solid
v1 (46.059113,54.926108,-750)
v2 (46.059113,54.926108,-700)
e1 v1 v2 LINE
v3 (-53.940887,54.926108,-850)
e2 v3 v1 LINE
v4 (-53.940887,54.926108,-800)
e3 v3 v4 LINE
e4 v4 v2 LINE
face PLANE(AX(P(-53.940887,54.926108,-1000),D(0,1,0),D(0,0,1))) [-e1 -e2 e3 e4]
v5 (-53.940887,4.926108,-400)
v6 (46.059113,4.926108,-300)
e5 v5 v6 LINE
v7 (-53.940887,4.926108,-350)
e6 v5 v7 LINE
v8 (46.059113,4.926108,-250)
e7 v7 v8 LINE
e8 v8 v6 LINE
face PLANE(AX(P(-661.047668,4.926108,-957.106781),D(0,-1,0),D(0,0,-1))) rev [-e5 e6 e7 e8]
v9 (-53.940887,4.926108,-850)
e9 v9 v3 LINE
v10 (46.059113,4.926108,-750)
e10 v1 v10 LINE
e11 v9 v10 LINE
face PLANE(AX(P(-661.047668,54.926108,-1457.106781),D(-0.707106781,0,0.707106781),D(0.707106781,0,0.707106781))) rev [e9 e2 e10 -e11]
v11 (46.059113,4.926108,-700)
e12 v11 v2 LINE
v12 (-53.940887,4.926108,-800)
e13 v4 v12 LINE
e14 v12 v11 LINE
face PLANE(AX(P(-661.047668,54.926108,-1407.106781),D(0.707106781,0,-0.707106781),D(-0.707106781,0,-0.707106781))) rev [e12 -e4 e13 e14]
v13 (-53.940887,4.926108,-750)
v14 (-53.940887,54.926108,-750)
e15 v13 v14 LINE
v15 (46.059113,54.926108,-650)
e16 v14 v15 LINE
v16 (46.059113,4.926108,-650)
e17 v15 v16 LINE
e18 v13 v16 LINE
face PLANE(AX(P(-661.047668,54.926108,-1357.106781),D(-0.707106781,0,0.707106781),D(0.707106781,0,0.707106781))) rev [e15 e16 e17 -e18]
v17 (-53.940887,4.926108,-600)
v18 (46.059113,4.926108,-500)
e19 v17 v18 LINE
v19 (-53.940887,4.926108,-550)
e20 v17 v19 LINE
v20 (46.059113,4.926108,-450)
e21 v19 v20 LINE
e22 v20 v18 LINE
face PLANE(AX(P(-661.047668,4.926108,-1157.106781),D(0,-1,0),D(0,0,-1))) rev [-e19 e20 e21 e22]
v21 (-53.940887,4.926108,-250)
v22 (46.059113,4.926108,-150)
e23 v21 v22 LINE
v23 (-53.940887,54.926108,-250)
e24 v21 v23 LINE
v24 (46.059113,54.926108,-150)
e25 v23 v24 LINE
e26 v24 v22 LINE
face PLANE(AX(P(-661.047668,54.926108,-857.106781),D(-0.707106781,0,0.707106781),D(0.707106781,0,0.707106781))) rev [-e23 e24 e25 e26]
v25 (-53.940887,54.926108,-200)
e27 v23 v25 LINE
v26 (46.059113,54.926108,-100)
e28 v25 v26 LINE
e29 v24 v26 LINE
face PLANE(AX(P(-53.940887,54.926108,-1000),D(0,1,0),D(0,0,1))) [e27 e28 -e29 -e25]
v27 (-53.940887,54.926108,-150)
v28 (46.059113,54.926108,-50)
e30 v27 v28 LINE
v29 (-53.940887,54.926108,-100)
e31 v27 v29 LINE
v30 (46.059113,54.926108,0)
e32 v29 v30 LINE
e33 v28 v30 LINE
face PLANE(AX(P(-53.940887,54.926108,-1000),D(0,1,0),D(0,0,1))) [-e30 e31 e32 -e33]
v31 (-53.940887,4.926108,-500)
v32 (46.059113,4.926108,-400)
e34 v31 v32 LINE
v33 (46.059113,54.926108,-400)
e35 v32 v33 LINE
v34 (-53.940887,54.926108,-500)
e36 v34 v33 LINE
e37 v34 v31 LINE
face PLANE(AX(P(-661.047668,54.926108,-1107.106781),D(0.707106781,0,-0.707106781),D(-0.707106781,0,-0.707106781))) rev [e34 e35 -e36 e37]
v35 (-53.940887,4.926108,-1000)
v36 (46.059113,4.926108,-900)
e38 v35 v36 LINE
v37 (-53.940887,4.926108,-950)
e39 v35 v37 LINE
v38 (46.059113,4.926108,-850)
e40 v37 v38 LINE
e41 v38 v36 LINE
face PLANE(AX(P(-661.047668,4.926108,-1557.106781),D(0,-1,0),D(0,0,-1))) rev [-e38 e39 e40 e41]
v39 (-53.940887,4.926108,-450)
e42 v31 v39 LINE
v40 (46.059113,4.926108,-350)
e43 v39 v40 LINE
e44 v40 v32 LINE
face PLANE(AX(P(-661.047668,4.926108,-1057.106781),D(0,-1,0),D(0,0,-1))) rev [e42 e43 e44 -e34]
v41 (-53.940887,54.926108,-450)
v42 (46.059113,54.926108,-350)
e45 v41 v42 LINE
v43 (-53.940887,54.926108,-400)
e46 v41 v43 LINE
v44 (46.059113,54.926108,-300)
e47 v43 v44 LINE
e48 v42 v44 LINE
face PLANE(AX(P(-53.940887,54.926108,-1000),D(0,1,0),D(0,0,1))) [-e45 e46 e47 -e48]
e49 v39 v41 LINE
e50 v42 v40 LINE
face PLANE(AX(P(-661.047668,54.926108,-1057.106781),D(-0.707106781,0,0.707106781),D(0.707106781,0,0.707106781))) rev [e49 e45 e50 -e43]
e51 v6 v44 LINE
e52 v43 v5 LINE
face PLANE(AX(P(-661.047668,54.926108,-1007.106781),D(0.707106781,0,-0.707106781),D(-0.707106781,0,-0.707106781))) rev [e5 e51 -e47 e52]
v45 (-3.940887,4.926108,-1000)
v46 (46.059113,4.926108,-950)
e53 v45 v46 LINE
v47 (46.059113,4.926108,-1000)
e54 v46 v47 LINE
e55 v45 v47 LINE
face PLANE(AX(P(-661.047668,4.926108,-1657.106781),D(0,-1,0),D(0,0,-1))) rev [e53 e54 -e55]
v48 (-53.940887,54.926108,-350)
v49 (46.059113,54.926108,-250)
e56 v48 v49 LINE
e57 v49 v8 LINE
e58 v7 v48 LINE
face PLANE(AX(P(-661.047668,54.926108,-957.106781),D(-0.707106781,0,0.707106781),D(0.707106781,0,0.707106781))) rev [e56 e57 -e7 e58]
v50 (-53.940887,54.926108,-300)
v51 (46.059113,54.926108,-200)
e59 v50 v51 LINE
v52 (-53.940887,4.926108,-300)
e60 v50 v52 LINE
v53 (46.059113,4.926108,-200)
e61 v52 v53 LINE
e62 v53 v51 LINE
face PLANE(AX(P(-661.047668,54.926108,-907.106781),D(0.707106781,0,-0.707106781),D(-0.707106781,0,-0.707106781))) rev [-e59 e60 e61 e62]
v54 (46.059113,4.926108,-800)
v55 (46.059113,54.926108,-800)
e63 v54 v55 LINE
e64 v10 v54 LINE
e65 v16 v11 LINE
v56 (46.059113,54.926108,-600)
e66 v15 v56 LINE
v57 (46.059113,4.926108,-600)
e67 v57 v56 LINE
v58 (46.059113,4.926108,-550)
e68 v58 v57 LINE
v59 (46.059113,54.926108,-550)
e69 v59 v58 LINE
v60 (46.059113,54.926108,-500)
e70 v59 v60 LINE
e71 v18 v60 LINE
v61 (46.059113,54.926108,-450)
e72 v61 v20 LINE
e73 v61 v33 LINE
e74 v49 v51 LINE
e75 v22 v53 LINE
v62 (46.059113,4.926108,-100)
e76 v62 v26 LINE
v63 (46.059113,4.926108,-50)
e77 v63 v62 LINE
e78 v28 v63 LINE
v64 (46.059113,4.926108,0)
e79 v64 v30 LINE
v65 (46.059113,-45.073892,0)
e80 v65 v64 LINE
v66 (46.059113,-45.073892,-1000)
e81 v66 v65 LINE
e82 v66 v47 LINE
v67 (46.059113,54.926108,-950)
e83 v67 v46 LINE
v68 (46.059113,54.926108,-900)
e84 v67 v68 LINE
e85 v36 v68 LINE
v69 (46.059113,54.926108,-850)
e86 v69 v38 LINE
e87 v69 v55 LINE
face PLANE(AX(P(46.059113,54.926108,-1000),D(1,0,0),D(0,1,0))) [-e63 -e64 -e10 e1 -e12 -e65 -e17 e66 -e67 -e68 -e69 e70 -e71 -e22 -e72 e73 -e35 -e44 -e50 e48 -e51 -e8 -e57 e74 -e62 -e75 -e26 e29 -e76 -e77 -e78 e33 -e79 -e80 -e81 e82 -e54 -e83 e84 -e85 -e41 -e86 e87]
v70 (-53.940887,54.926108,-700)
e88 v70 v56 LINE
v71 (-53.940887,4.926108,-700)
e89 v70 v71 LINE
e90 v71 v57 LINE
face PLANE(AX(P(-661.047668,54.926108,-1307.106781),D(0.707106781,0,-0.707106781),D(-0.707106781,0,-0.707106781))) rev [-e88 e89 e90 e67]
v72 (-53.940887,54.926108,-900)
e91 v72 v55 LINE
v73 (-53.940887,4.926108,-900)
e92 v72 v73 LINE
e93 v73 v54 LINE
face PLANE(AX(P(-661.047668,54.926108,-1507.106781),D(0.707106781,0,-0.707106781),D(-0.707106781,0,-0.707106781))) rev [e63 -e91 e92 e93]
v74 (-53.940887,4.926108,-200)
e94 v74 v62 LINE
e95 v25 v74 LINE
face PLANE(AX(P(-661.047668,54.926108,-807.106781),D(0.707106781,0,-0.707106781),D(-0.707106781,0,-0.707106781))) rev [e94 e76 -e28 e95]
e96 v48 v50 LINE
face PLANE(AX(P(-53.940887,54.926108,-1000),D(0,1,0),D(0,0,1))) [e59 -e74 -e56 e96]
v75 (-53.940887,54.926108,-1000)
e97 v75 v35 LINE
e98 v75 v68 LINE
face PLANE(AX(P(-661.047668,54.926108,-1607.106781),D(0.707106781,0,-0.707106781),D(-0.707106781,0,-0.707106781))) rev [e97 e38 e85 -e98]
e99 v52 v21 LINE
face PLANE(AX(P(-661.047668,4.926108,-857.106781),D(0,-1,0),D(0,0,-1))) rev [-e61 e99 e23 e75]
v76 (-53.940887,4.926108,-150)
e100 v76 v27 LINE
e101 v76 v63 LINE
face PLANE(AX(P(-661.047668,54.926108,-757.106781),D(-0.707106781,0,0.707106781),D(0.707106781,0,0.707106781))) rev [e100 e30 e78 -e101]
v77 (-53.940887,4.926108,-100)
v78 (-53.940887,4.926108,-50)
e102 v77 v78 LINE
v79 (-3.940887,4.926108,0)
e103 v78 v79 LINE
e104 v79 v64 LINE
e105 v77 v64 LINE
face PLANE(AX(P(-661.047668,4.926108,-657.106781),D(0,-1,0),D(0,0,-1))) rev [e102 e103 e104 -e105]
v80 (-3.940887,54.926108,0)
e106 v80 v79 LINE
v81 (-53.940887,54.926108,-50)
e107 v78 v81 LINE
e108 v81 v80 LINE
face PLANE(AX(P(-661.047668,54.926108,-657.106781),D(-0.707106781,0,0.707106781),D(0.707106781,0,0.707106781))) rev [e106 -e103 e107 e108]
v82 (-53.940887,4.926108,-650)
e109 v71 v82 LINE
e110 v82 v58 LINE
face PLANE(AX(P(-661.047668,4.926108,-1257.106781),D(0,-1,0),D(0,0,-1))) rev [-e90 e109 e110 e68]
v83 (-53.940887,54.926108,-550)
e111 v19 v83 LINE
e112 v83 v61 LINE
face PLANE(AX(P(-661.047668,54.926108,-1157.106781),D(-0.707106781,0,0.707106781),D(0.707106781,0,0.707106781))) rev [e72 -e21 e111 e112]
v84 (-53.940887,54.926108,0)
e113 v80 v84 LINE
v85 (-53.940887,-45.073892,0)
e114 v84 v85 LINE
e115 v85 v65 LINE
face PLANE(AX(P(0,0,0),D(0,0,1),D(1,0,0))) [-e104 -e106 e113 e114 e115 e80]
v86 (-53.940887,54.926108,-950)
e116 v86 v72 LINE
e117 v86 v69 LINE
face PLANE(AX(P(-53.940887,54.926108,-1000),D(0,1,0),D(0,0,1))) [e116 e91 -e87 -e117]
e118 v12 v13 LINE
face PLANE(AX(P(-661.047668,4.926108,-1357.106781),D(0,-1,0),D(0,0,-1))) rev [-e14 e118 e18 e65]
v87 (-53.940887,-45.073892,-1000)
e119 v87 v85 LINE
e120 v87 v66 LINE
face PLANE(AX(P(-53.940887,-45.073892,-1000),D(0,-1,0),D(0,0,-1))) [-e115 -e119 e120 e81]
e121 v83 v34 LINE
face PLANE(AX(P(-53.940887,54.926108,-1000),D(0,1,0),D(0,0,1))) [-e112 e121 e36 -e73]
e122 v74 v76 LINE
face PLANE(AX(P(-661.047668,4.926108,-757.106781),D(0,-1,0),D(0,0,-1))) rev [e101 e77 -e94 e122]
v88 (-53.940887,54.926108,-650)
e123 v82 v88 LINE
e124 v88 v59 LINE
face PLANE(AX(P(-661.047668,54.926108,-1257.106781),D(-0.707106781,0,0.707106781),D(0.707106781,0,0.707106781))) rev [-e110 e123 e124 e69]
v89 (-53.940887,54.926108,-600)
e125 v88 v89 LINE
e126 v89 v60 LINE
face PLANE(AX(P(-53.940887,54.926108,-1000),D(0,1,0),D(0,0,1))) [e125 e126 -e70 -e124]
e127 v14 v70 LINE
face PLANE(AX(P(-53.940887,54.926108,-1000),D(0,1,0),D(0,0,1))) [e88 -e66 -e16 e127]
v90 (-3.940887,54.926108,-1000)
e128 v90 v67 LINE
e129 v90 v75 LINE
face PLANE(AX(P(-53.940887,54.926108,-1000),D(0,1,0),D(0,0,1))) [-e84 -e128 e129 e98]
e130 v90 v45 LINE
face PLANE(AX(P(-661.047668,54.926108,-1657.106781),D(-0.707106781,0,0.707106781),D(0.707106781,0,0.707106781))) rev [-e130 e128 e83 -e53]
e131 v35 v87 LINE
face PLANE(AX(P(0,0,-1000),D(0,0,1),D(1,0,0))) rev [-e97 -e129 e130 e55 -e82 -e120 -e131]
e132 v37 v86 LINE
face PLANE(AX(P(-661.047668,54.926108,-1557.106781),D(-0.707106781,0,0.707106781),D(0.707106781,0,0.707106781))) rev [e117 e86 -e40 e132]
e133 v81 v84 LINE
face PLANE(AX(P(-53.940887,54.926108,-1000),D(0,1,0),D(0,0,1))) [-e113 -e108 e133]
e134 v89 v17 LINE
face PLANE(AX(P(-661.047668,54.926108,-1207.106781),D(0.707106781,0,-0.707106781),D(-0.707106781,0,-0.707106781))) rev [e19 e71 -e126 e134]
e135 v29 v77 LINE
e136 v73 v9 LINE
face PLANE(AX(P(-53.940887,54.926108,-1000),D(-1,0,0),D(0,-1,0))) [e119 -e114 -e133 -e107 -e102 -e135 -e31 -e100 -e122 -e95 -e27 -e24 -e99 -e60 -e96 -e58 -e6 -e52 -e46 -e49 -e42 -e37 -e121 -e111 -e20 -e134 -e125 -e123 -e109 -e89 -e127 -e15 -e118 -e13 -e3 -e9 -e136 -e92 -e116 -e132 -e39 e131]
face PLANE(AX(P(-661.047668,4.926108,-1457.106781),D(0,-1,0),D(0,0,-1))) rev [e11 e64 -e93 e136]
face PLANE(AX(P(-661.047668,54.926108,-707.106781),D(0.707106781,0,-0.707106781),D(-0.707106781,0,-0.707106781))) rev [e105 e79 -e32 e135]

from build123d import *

# Parameters (mm, degrees)
SKETCH1_W            = 100
SKETCH1_H            = 100
BOSS_EXTRUDE1_DEPTH  = 1000
SKETCH6_W            = 50
SKETCH6_H            = 50
CUT_EXTRUDE1_DEPTH   = 1000
LPATTERN1_COUNT      = 10
LPATTERN1_PITCH      = 100
LPATTERN1_COUNT_DIR2 = 10
LPATTERN1_PITCH_DIR2 = 100


with BuildPart() as part:
    # Sketch1 → Boss-Extrude1 (new body)
    with BuildSketch(Plane.XY):
        with Locations((-3.9408867, 4.926108374)):
            Rectangle(SKETCH1_W, SKETCH1_H)
    extrude(amount=-BOSS_EXTRUDE1_DEPTH)

    # Sketch6 → Cut-Extrude1 (cut, along a direction that is not the sketch's normal)
    with BuildSketch(Plane(origin=(46.0591133, 0, 0), x_dir=(0, 0, -1), z_dir=(1, 0, 0))):
        with Locations((75, 29.926108374)):
            Rectangle(SKETCH6_W, SKETCH6_H)
    cut_extrude1 = extrude(amount=-CUT_EXTRUDE1_DEPTH, dir=(0.7071067811865516, 0, 0.7071067811865435), mode=Mode.SUBTRACT)

    # LPattern1: Cut-Extrude1 10 × 10
    with Locations(*[Vector(0, 0, -1) * (i * LPATTERN1_PITCH) + Vector(0, 0, 1) * (j * LPATTERN1_PITCH_DIR2) for i in range(LPATTERN1_COUNT) for j in range(LPATTERN1_COUNT_DIR2) if (i, j) != (0, 0)]):
        add(cut_extrude1, mode=Mode.SUBTRACT)


solid = part.part
